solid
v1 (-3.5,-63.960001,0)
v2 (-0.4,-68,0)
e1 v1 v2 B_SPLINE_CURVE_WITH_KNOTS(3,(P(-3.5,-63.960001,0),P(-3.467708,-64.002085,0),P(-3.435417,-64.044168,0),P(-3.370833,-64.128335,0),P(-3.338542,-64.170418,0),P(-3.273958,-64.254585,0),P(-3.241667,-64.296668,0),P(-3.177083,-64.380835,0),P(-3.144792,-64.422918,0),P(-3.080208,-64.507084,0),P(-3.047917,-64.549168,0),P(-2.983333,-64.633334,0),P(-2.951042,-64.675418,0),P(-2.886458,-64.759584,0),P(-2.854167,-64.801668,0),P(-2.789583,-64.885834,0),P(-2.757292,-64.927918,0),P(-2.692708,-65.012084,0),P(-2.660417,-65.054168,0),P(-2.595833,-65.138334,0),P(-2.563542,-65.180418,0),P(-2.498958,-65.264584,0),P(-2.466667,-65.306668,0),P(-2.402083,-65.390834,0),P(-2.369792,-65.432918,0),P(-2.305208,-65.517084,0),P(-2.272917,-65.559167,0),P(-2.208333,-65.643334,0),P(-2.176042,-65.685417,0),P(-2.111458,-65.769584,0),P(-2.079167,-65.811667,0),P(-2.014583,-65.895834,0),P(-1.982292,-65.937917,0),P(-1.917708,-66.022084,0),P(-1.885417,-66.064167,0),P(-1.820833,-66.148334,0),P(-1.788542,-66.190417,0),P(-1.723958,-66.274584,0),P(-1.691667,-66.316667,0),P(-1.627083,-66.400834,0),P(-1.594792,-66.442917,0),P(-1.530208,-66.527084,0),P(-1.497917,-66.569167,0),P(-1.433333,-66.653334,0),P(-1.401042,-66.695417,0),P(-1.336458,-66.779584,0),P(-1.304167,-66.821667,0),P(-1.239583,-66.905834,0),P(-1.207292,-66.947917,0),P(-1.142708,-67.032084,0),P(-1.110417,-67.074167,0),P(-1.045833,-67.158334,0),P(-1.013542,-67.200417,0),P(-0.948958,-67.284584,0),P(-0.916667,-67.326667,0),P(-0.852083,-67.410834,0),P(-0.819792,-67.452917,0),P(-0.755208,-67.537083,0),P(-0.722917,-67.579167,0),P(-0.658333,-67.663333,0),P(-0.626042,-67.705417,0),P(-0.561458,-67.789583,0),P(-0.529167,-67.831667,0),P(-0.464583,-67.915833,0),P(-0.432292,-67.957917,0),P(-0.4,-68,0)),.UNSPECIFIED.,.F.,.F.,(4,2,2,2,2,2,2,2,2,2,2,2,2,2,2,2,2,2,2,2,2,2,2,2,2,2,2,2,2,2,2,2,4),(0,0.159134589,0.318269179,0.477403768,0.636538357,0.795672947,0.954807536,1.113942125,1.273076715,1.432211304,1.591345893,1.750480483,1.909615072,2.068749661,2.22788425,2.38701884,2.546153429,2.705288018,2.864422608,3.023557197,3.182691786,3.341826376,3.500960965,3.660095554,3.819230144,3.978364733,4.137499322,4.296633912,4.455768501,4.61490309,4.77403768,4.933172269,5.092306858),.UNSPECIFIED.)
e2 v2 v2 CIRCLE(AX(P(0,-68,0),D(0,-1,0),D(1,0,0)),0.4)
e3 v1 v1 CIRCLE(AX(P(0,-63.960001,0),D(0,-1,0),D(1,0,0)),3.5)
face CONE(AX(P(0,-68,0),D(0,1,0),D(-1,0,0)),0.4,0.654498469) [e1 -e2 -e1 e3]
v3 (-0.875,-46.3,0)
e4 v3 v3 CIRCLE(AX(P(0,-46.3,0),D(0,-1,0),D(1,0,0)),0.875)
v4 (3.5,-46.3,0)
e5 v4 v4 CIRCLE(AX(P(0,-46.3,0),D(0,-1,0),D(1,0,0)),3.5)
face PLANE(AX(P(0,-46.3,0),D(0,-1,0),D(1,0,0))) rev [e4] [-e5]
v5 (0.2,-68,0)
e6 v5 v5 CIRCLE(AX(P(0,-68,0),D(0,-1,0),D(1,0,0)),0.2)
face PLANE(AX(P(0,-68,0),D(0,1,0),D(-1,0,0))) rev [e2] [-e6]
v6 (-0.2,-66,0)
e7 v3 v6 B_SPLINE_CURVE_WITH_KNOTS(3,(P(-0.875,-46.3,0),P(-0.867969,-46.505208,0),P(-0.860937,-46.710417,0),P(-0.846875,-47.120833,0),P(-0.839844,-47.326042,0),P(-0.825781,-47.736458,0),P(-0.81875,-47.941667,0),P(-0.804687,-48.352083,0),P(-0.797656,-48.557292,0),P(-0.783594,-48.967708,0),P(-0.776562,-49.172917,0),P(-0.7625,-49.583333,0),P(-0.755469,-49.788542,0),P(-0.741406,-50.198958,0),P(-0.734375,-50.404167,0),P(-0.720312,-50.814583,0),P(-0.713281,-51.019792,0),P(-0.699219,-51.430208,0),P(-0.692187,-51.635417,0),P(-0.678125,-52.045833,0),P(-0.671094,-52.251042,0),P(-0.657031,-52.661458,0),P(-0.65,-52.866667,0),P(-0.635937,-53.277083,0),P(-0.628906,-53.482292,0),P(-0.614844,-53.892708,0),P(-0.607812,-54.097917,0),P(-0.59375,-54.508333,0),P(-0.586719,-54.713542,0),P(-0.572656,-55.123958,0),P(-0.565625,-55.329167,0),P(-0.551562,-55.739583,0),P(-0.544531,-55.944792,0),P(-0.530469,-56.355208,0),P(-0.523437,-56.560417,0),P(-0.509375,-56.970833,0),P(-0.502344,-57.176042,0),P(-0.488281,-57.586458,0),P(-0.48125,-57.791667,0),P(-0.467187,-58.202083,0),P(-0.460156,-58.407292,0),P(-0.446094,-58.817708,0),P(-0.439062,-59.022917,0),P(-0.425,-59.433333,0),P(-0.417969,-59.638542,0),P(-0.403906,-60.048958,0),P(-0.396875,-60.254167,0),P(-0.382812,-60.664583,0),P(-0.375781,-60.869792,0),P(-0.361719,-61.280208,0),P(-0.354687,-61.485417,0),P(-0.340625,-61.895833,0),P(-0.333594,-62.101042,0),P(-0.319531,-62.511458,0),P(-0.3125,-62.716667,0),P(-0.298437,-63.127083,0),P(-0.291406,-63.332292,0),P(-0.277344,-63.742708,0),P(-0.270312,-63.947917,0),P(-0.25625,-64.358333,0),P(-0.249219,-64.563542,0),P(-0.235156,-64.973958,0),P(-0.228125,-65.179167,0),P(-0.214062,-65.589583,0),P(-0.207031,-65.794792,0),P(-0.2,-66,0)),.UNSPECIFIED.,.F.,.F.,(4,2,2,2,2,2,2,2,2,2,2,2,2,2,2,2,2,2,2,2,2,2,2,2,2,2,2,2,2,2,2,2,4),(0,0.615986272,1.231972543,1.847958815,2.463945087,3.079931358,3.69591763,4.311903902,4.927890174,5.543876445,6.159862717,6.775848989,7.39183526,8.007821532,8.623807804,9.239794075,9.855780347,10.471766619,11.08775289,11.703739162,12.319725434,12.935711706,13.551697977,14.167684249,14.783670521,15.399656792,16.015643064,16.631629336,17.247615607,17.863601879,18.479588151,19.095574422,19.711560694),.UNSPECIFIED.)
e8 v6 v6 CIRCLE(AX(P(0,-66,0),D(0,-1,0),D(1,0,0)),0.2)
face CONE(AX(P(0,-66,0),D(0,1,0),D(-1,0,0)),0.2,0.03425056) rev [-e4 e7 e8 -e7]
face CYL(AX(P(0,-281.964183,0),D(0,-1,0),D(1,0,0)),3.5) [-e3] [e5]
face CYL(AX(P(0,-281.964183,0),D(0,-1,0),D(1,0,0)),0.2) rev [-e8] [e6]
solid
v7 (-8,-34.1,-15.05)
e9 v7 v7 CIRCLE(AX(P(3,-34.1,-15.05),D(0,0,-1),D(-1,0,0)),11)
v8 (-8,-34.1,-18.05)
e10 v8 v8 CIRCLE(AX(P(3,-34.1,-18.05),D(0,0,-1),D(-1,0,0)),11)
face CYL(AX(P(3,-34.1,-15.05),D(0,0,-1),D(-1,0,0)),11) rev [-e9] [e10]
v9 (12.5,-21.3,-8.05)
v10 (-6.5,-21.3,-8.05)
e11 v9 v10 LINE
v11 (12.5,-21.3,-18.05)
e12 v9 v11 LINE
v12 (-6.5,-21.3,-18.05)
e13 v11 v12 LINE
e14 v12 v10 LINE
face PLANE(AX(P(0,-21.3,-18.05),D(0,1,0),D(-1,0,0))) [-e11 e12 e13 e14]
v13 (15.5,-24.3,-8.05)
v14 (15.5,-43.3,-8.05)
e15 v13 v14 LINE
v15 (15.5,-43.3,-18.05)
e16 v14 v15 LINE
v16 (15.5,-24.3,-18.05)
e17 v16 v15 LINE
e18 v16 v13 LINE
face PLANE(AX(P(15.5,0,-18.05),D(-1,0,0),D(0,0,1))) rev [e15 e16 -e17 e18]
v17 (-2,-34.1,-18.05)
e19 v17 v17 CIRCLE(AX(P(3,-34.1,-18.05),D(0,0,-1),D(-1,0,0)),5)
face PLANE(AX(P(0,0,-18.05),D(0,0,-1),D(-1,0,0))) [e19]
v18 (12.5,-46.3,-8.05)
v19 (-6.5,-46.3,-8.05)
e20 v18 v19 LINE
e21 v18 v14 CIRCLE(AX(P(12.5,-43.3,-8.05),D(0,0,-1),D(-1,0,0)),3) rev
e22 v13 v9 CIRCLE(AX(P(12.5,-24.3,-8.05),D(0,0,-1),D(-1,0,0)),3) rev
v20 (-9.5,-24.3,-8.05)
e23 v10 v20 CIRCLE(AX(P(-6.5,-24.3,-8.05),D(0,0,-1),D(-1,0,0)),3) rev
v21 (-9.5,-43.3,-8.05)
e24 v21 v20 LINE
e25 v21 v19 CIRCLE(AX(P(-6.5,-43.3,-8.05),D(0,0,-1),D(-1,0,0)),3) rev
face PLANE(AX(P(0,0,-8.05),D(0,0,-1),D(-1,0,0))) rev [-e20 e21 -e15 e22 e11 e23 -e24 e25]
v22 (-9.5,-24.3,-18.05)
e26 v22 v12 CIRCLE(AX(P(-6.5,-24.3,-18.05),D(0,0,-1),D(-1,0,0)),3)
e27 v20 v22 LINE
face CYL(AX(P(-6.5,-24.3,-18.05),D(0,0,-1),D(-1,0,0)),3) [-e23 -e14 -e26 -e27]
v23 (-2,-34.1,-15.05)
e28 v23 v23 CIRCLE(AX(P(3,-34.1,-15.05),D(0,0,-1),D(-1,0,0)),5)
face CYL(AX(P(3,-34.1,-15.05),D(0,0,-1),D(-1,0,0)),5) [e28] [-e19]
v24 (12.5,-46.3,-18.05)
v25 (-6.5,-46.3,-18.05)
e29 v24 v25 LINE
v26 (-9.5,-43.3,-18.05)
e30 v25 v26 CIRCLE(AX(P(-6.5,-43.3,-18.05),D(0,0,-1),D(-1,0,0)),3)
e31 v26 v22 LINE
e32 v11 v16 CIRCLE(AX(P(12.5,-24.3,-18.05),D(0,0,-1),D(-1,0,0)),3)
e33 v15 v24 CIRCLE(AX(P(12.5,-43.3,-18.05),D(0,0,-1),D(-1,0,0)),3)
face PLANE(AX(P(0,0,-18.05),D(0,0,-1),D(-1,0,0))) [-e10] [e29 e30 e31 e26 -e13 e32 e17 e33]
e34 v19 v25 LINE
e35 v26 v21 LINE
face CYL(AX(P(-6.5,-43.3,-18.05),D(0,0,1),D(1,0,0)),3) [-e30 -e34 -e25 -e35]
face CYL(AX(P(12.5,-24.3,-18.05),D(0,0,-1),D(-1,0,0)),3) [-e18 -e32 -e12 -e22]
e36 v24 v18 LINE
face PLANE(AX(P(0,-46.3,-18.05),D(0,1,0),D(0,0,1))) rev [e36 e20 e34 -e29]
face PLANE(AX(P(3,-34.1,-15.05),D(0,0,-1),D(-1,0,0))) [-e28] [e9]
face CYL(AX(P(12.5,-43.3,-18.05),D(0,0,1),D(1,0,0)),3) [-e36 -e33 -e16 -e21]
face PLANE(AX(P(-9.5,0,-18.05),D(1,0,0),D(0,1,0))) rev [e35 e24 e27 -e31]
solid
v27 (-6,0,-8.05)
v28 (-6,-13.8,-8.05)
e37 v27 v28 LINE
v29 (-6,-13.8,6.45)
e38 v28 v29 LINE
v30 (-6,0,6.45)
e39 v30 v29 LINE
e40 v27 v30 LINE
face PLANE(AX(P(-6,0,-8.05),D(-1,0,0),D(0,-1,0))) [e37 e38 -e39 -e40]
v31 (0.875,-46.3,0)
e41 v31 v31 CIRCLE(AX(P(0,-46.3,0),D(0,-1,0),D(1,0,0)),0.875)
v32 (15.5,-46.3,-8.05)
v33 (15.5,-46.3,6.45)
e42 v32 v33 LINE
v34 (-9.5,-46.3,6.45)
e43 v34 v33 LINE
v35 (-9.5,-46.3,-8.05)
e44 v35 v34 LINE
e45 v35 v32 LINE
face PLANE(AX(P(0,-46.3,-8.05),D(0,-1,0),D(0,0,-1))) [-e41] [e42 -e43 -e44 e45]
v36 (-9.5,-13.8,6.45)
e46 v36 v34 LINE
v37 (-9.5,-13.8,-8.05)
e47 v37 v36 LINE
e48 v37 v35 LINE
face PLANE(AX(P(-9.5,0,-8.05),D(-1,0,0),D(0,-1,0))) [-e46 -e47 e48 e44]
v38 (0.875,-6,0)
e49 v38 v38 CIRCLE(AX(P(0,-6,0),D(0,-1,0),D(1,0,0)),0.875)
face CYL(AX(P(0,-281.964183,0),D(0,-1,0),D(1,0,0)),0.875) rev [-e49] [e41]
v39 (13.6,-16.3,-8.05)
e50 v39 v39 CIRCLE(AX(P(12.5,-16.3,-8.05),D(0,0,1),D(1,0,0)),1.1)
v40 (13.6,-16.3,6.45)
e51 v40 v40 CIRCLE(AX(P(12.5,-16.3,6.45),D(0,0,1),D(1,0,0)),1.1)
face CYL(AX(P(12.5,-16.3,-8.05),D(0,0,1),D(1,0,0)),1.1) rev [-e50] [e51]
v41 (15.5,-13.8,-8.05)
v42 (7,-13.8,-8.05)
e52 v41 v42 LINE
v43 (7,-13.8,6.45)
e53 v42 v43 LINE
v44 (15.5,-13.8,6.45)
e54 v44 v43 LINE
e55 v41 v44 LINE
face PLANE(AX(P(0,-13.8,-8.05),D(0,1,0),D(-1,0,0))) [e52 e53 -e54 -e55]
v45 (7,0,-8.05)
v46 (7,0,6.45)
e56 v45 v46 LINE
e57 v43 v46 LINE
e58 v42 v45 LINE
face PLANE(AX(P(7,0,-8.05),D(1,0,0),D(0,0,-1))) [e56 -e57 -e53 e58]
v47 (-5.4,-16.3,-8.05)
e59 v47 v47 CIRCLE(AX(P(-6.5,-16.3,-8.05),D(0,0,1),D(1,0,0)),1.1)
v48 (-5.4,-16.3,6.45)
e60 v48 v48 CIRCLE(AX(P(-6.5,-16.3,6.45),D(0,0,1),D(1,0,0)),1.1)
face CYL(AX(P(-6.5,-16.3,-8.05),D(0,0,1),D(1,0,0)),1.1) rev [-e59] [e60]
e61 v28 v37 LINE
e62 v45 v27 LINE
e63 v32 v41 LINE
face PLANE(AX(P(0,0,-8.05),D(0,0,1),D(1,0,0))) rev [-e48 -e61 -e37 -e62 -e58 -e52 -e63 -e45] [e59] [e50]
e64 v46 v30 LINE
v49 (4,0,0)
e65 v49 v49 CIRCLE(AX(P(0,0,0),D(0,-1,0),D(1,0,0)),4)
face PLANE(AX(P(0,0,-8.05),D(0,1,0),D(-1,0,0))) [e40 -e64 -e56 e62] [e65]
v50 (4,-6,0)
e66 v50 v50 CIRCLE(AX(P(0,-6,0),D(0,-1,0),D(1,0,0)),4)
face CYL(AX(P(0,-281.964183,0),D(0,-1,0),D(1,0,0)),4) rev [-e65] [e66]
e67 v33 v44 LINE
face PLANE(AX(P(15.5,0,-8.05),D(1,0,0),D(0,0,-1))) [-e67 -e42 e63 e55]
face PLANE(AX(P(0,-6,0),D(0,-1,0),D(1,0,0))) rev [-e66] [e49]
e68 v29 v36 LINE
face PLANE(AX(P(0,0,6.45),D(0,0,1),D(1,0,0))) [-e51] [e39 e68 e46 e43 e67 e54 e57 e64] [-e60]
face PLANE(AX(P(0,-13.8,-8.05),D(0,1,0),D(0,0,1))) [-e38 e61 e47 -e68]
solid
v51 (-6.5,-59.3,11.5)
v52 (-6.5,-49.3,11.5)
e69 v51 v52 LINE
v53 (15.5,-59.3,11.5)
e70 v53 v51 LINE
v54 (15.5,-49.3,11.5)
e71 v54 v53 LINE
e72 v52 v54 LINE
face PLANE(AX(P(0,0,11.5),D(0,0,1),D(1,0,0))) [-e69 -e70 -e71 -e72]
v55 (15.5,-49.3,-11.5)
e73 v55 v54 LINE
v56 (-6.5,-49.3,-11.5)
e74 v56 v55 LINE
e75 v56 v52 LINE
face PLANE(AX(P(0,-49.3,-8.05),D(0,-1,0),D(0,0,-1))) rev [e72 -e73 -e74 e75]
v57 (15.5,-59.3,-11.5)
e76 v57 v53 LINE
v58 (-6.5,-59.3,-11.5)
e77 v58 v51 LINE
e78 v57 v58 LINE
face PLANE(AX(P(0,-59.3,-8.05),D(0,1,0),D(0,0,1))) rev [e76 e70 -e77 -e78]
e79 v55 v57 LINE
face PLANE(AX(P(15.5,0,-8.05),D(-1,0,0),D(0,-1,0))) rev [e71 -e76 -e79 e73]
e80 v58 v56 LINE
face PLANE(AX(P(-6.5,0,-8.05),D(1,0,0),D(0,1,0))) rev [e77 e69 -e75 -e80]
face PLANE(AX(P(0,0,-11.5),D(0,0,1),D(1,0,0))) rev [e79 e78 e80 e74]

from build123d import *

# Parameters (mm, degrees)
BOSS_EXTRUDE1_DEPTH        = 6.45
BOSS_EXTRUDE1_DEPTH_BACK   = 8.05
SKETCH1_R                  = 1.1
BOSS_EXTRUDE1_2_DEPTH      = 6.45
BOSS_EXTRUDE1_2_DEPTH_BACK = 8.05
SKETCH1_W                  = 22
SKETCH1_H                  = 10
SKETCH1_7_W                = 6.5
SKETCH1_7_H                = 10
SKETCH1_7_W_2              = 12
BOSS_EXTRUDE2_DEPTH        = 11.5
SKETCH2_W                  = 25
SKETCH2_H                  = 25
SKETCH2_R                  = 11
SKETCH2_R_2                = 5
BOSS_EXTRUDE3_DEPTH        = 10
CUT_EXTRUDE1_START         = 10
SKETCH2_3_R                = 11
SKETCH2_3_R_2              = 5
CUT_EXTRUDE1_DEPTH         = 3
FILLET1_R                  = 3


# Read off the part's stored shape, not the designer's step: Revolve1
with BuildPart() as part:
    # Sketch1 → Boss-Extrude1 (new, two sides: drawn at the far end of the back side and taken through both)
    with BuildSketch(Plane.XY.offset(-BOSS_EXTRUDE1_DEPTH_BACK)):
        Polygon((7, 0), (-6, 0), (-6, -13.8), (-9.5, -13.8), (-9.5, -46.3), (15.5, -46.3), (15.5, -13.8), (7, -13.8), align=None)
        with Locations((-6.5, -16.3)):
            Circle(SKETCH1_R, mode=Mode.SUBTRACT)
        with Locations((12.5, -16.3)):
            Circle(SKETCH1_R, mode=Mode.SUBTRACT)
    extrude(amount=BOSS_EXTRUDE1_DEPTH + BOSS_EXTRUDE1_DEPTH_BACK)

    # Sketch1<6> → Cut-Revolve1 (revolve, cut)
    with BuildSketch(Plane.XY, mode=Mode.PRIVATE) as cut_revolve1_sk:
        Polygon((4, -6), (4, 0), (0, 0), (0, -46.3), (0.875, -46.3), (0.875, -6), align=None)
    revolve(cut_revolve1_sk.sketch.rotate(Axis((0, -281.964182831, 0), (0, 1, 0)), 180), axis=Axis((0, -281.964182831, 0), (0, 1, 0)), mode=Mode.SUBTRACT)


with BuildPart() as body_2:
    # Sketch1 → Boss-Extrude1 2 (new, two sides: drawn at the far end of the back side and taken through both)
    with BuildSketch(Plane.XY.offset(-BOSS_EXTRUDE1_2_DEPTH_BACK)):
        with Locations((4.5, -54.3)):
            Rectangle(SKETCH1_W, SKETCH1_H)
    extrude(amount=BOSS_EXTRUDE1_2_DEPTH + BOSS_EXTRUDE1_2_DEPTH_BACK)

    # Sketch1<7> → Boss-Extrude2 (add, symmetric)
    with BuildSketch(Plane.XY):
        with Locations((-3.25, -54.3)):
            Rectangle(SKETCH1_7_W, SKETCH1_7_H)
        Polygon((0.772208122, -49.3), (0, -49.3), (0, -59.3), (0.429568528, -59.3), align=None)
        Polygon((3.5, -49.3), (0.772208122, -49.3), (0.429568528, -59.3), (3.5, -59.3), align=None)
        with Locations((9.5, -54.3)):
            Rectangle(SKETCH1_7_W_2, SKETCH1_7_H)
    extrude(amount=BOSS_EXTRUDE2_DEPTH, both=True)


with BuildPart() as body_3:
    # Revolve1 outline → Revolve1 (revolve)
    with BuildSketch(Plane.XY):
        Polygon((0.875, -46.3), (0.2, -66), (0.2, -68), (0.4, -68), (3.5, -63.960001344), (3.5, -46.3), align=None)
    revolve(axis=Axis((0, 0, 0), (0, 1, 0)))


with BuildPart() as body_4:
    # Sketch2 → Boss-Extrude3 (new body)
    # profile 1 of 3: a face of its own
    with BuildSketch(Plane(origin=(0, 0, -8.05), x_dir=(-1, 0, 0), z_dir=(0, 0, -1))):
        with Locations((-3, -33.8)):
            Rectangle(SKETCH2_W, SKETCH2_H)
        with Locations((-3, -34.1)):
            Circle(SKETCH2_R, mode=Mode.SUBTRACT)
    # profile 2 of 3: a face of its own
    with BuildSketch(Plane(origin=(0, 0, -8.05), x_dir=(-1, 0, 0), z_dir=(0, 0, -1))):
        with Locations((-3, -34.1)):
            Circle(SKETCH2_R)
        with Locations((-3, -34.1)):
            Circle(SKETCH2_R_2, mode=Mode.SUBTRACT)
    # profile 3 of 3: a face of its own
    with BuildSketch(Plane(origin=(0, 0, -8.05), x_dir=(-1, 0, 0), z_dir=(0, 0, -1))):
        with Locations((-3, -34.1)):
            Circle(SKETCH2_R_2)
    extrude(amount=BOSS_EXTRUDE3_DEPTH)

    # Sketch2<3> → Cut-Extrude1 (cut)
    with BuildSketch(Plane(origin=(0, 0, -8.05), x_dir=(-1, 0, 0), z_dir=(0, 0, -1)).offset(CUT_EXTRUDE1_START)):
        with Locations((-3, -34.1)):
            Circle(SKETCH2_3_R)
        with Locations((-3, -34.1)):
            Circle(SKETCH2_3_R_2, mode=Mode.SUBTRACT)
    extrude(amount=-CUT_EXTRUDE1_DEPTH, mode=Mode.SUBTRACT)

    # Fillet1
    fillet1_edges = [body_4.edges().sort_by_distance(p)[0] for p in [
        (-9.5, -21.3, -13.05),
        (-9.5, -46.3, -13.05),
        (15.5, -46.3, -13.05),
        (15.5, -21.3, -13.05),
    ]]
    fillet(fillet1_edges, radius=FILLET1_R)


solid = Compound([part.part, body_2.part, body_3.part, body_4.part])
